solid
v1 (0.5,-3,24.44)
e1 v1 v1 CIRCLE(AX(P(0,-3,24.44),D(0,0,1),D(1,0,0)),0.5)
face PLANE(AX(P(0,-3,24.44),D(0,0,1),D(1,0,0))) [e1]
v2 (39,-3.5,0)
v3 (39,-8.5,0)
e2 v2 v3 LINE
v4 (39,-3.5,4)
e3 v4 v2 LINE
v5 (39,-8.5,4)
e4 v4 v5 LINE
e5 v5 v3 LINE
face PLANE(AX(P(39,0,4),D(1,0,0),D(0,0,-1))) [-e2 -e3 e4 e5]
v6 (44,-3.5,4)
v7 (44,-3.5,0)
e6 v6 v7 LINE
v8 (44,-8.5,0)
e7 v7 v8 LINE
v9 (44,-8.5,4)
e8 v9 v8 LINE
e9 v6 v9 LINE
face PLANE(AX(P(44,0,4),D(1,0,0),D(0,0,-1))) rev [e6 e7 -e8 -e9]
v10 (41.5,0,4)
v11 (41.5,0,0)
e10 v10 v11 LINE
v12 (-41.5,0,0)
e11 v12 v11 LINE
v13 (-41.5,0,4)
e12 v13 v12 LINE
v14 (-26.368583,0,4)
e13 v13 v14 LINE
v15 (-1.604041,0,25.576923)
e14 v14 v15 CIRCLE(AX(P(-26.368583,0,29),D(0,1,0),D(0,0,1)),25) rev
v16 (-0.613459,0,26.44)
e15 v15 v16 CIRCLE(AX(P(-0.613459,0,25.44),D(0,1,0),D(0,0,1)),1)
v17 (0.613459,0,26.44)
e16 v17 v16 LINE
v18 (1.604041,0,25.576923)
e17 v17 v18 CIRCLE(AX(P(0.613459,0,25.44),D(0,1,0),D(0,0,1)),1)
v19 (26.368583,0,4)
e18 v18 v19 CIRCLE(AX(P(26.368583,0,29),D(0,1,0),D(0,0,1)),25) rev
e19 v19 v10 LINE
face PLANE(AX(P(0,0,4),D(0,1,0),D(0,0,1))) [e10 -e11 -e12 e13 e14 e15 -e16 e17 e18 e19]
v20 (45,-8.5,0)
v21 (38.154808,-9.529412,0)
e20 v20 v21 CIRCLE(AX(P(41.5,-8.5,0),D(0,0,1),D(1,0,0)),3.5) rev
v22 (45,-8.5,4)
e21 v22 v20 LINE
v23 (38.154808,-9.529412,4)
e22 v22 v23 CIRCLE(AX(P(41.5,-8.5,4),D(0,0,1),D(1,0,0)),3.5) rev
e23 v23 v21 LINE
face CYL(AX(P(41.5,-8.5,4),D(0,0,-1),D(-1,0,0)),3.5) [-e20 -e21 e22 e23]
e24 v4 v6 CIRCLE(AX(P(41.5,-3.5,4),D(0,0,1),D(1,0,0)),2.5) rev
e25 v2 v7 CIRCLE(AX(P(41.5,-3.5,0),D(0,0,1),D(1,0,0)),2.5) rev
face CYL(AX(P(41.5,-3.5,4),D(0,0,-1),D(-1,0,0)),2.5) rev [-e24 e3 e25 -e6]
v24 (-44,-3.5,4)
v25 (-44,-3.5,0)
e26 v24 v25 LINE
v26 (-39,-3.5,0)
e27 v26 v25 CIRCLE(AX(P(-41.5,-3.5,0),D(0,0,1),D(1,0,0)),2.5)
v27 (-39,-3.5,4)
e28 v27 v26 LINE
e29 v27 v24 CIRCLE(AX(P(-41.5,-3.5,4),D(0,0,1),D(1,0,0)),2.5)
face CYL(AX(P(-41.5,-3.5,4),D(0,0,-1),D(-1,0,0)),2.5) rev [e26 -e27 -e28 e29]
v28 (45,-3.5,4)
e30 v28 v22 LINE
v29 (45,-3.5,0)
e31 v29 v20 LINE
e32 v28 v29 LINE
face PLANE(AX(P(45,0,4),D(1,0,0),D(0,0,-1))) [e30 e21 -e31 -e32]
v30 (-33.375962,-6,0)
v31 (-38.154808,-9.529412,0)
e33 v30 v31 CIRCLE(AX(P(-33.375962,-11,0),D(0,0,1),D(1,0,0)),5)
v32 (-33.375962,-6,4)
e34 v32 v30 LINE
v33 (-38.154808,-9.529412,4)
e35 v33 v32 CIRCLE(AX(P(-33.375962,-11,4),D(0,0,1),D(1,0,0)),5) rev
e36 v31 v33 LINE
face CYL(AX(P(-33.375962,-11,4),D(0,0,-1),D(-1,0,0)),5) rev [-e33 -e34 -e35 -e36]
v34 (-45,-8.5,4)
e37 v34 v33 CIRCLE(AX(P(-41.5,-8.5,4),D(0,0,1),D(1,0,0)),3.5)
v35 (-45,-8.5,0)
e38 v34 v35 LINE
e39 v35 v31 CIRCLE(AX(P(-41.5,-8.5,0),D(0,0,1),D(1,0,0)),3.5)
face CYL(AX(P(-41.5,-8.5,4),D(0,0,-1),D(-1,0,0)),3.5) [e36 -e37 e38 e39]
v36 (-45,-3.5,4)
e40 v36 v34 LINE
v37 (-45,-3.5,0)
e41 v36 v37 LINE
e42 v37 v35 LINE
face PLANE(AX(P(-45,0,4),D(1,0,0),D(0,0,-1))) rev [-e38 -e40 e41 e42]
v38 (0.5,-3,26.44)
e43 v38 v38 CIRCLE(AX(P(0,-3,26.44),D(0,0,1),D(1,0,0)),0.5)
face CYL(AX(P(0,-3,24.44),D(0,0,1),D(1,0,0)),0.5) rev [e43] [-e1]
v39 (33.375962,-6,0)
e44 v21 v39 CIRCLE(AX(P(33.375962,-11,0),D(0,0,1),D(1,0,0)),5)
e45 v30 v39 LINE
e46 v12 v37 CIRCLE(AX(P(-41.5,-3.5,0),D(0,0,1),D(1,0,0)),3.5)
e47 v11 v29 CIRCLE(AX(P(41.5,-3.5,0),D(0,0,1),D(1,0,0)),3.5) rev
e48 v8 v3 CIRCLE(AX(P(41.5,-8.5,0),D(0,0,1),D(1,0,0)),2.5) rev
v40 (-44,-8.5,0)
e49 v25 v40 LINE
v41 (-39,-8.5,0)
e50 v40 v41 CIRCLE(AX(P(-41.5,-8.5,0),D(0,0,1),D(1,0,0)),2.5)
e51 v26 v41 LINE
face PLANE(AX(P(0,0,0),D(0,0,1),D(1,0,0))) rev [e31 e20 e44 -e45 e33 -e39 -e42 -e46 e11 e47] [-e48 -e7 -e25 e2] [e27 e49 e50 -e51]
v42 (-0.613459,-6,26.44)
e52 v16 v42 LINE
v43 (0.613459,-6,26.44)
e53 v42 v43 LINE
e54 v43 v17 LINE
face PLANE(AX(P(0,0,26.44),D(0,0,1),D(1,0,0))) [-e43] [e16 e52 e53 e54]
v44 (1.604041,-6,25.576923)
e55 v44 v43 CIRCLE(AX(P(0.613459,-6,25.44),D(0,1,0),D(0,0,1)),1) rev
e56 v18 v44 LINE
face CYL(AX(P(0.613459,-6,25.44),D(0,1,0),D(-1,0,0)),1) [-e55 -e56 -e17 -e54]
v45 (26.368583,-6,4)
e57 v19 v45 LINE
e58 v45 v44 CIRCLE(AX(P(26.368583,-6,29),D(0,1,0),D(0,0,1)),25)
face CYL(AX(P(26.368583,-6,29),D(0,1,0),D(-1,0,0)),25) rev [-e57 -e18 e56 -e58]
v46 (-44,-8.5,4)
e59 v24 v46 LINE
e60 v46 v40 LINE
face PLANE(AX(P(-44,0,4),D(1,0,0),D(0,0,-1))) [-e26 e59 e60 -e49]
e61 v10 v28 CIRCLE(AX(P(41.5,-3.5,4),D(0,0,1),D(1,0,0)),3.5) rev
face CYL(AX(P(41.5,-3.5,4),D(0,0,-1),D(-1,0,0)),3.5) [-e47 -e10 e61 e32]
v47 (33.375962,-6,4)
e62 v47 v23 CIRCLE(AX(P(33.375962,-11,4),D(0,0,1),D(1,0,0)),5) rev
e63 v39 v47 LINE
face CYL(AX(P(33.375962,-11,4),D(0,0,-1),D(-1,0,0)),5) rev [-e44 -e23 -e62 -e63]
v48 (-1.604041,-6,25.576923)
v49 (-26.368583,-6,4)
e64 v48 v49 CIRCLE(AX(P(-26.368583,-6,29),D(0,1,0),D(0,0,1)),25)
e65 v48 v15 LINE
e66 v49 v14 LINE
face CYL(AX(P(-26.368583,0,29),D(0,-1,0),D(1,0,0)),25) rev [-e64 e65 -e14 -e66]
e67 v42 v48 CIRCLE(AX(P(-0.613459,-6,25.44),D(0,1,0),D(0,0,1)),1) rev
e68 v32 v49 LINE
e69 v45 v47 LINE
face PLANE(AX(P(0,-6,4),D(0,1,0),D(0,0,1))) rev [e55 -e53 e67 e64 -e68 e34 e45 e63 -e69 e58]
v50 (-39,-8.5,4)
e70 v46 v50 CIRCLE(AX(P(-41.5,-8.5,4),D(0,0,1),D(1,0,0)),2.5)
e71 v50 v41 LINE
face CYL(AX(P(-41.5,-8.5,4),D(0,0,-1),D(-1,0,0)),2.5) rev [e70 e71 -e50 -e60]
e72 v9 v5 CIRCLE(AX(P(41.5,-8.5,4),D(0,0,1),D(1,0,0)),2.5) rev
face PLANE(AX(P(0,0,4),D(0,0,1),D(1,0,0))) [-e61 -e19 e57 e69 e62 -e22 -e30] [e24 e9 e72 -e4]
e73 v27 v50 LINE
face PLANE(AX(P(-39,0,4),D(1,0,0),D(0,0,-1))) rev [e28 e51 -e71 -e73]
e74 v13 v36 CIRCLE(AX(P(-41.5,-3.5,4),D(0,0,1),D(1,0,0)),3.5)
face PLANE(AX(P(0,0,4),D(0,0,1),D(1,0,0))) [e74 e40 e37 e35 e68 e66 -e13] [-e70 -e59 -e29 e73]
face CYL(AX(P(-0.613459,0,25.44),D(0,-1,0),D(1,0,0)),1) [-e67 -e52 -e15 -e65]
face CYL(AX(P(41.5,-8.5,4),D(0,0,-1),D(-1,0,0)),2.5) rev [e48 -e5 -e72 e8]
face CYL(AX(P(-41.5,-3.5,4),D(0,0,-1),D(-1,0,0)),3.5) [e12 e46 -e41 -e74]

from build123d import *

# Parameters (mm, degrees)
SALIENTE_EXTRUIR1_DEPTH = 4
REDONDEO1_R             = 5
CROQUIS2_W              = 3
CROQUIS2_H              = 6
SALIENTE_EXTRUIR2_DEPTH = 22.44
REDONDEO2_R             = 25
CROQUIS3_R              = 0.5
CORTAR_EXTRUIR1_DEPTH   = 2
REDONDEO3_R             = 1


with BuildPart() as part:
    # Croquis1 → Saliente-Extruir1 (new body)
    # profile 1 of 4: a face of its own
    with BuildSketch(Plane.XY):
        with BuildLine():
            Line((-38, -3.5), (-38, -8.5))
            ThreePointArc((-38, -8.5), (-41.5, -12), (-45, -8.5))
            Line((-45, -8.5), (-45, -3.5))
            ThreePointArc((-45, -3.5), (-41.5, 0), (-38, -3.5))
        make_face()
        with BuildLine():
            ThreePointArc((-44, -8.5), (-41.5, -11), (-39, -8.5))
            Line((-39, -8.5), (-39, -3.5))
            ThreePointArc((-39, -3.5), (-41.5, -1), (-44, -3.5))
            Line((-44, -3.5), (-44, -8.5))
        make_face(mode=Mode.SUBTRACT)
    # profile 2 of 4: a face of its own
    with BuildSketch(Plane.XY):
        with BuildLine():
            Line((0, 0), (-41.5, 0))
            ThreePointArc((-41.5, 0), (-39.025126266, -1.025126266), (-38, -3.5))
            Line((-38, -3.5), (-38, -6))
            Line((-38, -6), (0, -6))
            Line((0, -6), (0, 0))
        make_face()
    # profile 3 of 4: a face of its own
    with BuildSketch(Plane.XY):
        with BuildLine():
            Line((41.5, 0), (0, 0))
            Line((0, 0), (0, -6))
            Line((0, -6), (38, -6))
            Line((38, -6), (38, -3.5))
            ThreePointArc((38, -3.5), (39.025126266, -1.025126266), (41.5, 0))
        make_face()
    # profile 4 of 4: a face of its own
    with BuildSketch(Plane.XY):
        with BuildLine():
            ThreePointArc((45, -8.5), (41.5, -12), (38, -8.5))
            Line((38, -8.5), (38, -3.5))
            ThreePointArc((38, -3.5), (41.5, 0), (45, -3.5))
            Line((45, -3.5), (45, -8.5))
        make_face()
        with BuildLine():
            Line((39, -3.5), (39, -8.5))
            ThreePointArc((39, -8.5), (41.5, -11), (44, -8.5))
            Line((44, -8.5), (44, -3.5))
            ThreePointArc((44, -3.5), (41.5, -1), (39, -3.5))
        make_face(mode=Mode.SUBTRACT)
    extrude(amount=SALIENTE_EXTRUIR1_DEPTH)

    # Redondeo1
    redondeo1_edges = [part.edges().sort_by_distance(p)[0] for p in [
        (38, -6, 2),
        (-38, -6, 2),
    ]]
    fillet(redondeo1_edges, radius=REDONDEO1_R)

    # Croquis2 → Saliente-Extruir2 (add)
    with BuildSketch(Plane.XY.offset(4)):
        with Locations((0, -3)):
            Rectangle(CROQUIS2_W, CROQUIS2_H)
    extrude(amount=SALIENTE_EXTRUIR2_DEPTH)

    # Redondeo2
    # the kernel refuses this fillet: 25 mm, written as the material it adds along each edge
    with BuildSketch(Plane(origin=(1.5, -6, 4), x_dir=(1, 0, 0), z_dir=(0, 1, 0)), Plane(origin=(-1.5, 0, 4), x_dir=(-1, 0, 0), z_dir=(0, -1, 0))) as redondeo2_piece_1:
        with BuildLine():
            CenterArc((24.868582589, -25), REDONDEO2_R, 90, 84.122610013)
            Line((0, -22.44), (-0.497371652, -22.3888))
            ThreePointArc((-0.497371652, -22.3888), (-0.5, -11.22), (-0.5, 0))
            Line((-0.5, 0), (0, 0.5))
            Line((0, 0.5), (24.868582589, 0.5))
            Line((24.868582589, 0.5), (24.868582589, 0))
        make_face()
    extrude(amount=6)

    # Croquis3 → Cortar-Extruir1 (cut)
    with BuildSketch(Plane.XY.offset(26.44)):
        with Locations((0, -3)):
            Circle(CROQUIS3_R)
    extrude(amount=-CORTAR_EXTRUIR1_DEPTH, mode=Mode.SUBTRACT)

    # Redondeo3
    redondeo3_edges = [part.edges().sort_by_distance(p)[0] for p in [
        (-1.5, -3, 26.44),
        (1.5, -3, 26.44),
    ]]
    fillet(redondeo3_edges, radius=REDONDEO3_R)


solid = part.part
